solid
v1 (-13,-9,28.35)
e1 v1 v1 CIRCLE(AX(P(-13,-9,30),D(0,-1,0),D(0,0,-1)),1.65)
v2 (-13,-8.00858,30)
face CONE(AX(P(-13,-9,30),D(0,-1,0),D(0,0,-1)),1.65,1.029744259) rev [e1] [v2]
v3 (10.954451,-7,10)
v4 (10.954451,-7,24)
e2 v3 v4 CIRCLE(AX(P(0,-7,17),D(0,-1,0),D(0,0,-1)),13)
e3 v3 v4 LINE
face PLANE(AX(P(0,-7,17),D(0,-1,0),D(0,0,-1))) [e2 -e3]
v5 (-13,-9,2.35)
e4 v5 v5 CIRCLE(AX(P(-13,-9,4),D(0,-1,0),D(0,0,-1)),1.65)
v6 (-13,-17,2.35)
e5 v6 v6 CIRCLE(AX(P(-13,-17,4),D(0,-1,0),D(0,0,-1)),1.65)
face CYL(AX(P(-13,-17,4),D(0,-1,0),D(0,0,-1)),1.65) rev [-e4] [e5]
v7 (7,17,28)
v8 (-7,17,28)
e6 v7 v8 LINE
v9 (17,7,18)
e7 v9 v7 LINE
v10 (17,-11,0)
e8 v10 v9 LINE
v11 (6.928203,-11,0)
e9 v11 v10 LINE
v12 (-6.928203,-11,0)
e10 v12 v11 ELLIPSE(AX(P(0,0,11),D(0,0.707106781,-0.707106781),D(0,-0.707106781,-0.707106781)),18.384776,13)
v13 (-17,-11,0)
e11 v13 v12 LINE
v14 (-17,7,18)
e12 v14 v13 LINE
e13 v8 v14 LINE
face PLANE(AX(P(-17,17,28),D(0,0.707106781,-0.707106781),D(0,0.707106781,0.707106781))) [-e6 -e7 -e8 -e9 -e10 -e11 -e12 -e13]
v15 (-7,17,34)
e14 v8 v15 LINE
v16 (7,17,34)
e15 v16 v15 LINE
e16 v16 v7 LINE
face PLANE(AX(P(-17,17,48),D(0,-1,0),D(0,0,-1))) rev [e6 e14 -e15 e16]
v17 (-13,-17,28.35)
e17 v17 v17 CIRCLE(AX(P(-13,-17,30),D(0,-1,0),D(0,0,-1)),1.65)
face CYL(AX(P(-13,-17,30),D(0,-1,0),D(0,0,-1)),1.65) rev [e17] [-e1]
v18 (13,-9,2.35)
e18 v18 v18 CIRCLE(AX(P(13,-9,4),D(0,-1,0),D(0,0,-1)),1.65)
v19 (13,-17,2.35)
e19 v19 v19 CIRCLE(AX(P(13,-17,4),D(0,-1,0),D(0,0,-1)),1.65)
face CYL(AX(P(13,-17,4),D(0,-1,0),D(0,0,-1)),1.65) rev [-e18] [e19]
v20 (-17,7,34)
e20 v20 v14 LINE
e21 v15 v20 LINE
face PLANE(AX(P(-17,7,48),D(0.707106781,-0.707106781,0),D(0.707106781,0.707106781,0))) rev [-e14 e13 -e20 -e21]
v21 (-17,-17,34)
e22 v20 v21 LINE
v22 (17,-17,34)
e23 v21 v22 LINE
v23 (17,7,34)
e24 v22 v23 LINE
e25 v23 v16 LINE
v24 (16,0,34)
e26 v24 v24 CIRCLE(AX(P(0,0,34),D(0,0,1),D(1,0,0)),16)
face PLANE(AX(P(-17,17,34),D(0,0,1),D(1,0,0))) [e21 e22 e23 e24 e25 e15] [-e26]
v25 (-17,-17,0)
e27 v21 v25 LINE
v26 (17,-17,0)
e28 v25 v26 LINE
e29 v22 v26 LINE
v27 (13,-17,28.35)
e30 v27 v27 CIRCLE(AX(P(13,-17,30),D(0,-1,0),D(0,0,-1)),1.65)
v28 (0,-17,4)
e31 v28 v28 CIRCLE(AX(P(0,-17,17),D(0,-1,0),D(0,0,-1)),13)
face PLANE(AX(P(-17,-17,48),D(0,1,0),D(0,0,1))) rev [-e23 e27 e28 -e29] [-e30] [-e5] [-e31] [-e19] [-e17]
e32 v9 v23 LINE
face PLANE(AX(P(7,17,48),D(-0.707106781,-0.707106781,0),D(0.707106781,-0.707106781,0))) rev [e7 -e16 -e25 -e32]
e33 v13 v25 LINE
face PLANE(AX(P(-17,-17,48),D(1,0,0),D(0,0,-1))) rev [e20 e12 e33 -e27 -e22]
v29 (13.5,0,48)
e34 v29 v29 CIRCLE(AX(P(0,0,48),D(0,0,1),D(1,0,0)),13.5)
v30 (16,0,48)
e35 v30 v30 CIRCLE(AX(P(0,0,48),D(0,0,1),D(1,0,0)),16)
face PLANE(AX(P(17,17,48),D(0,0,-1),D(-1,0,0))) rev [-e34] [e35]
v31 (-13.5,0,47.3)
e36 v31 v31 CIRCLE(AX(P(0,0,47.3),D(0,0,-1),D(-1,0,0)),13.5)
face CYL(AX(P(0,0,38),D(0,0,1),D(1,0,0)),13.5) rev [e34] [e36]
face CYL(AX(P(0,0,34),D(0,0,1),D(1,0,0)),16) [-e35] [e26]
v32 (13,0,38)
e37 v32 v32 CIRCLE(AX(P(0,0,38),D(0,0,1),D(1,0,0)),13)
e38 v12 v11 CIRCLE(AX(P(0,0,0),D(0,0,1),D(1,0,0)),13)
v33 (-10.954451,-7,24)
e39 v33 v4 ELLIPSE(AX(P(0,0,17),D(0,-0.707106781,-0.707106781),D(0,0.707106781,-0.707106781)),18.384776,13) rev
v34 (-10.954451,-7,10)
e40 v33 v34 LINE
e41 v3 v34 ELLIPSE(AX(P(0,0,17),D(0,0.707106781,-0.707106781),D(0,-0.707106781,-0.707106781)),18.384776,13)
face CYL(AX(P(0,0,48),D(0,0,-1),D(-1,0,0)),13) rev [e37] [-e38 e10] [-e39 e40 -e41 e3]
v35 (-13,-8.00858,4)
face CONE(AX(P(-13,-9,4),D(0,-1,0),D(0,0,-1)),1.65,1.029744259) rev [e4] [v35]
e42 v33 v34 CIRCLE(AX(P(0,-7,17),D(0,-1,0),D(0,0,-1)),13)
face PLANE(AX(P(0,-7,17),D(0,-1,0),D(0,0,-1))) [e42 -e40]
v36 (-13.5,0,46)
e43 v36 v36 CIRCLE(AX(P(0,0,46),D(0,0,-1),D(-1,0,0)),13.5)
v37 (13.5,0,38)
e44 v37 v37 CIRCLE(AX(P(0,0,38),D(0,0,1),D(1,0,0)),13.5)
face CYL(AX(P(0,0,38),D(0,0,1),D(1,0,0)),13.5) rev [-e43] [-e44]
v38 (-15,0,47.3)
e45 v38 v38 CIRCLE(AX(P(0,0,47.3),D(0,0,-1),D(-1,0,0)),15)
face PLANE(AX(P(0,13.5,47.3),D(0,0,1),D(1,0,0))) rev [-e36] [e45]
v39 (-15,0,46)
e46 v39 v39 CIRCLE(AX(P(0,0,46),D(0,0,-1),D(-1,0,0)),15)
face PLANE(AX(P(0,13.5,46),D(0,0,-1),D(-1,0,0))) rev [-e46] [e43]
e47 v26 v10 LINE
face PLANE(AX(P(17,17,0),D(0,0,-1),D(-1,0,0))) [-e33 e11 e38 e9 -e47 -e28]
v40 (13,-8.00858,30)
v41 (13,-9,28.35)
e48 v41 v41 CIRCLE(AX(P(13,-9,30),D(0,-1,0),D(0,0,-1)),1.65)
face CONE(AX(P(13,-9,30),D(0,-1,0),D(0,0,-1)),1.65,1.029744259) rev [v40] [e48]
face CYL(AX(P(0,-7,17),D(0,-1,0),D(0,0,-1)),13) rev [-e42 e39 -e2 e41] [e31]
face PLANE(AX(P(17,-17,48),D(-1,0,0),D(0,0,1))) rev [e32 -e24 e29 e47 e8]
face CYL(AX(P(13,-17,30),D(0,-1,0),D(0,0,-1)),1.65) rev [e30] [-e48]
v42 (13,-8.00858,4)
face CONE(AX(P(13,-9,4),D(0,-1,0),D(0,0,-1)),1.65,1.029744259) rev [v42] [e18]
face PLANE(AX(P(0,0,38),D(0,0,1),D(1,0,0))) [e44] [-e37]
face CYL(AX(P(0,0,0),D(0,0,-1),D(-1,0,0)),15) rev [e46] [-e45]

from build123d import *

# Parameters (mm, degrees)
SKETCH_1_W             = 34
SKETCH_1_H             = 34
SKETCH_1_R             = 13
EXTRUDE_1_DEPTH        = 48
SKETCH_2_R             = 13.5
CUT_EXTRUDE_1_DEPTH    = 10
SKETCH_3_R             = 13
CUT_EXTRUDE_2_DEPTH    = 10
CHAMFER_1_SIZE         = 10
CHAMFER_2_SIZE         = 28
SKETCH_5_R             = 16
CUT_EXTRUDE_4_DEPTH    = 14
HOLE_WIZARD_M4_1_D     = 3.3
HOLE_WIZARD_M4_1_DEPTH = 8
HOLE_WIZARD_M4_1_TIP   = 0.991420021
SKETCH_8_W             = 1.3
SKETCH_8_H             = 1.5


with BuildPart() as part:
    # 草图1 → 凸台-拉伸1 (new body)
    with BuildSketch(Plane.XY):
        Rectangle(SKETCH_1_W, SKETCH_1_H)
        Circle(SKETCH_1_R, mode=Mode.SUBTRACT)
    extrude(amount=EXTRUDE_1_DEPTH)

    # 草图2 → 切除-拉伸1 (cut)
    with BuildSketch(Plane.XY.offset(48)):
        Circle(SKETCH_2_R)
    extrude(amount=-CUT_EXTRUDE_1_DEPTH, mode=Mode.SUBTRACT)

    # 草图3 → 切除-拉伸2 (cut)
    with BuildSketch(Plane.XZ.offset(17)):
        with Locations(Location((0, 17, 0), (0, 0, 270))):
            Circle(SKETCH_3_R)
    extrude(amount=-CUT_EXTRUDE_2_DEPTH, mode=Mode.SUBTRACT)

    # 倒角1
    chamfer_1_edges = [part.edges().sort_by_distance(p)[0] for p in [
        (-17, 17, 24),
        (17, 17, 24),
    ]]
    chamfer(chamfer_1_edges, length=CHAMFER_1_SIZE)

    # 倒角2
    # the kernel refuses this chamfer: 28 mm, written as the material it takes off along each edge
    with BuildSketch(Plane(origin=(79.007123663, 17, 0), x_dir=(0, -0.9996219169112968, -0.027495876610586376), z_dir=(-1, 0, 0))) as chamfer_2_piece_1:
        Polygon((CHAMFER_2_SIZE * 0.999621916911, CHAMFER_2_SIZE * 0.0274958766106), (-CHAMFER_2_SIZE * 0.0274958766106, CHAMFER_2_SIZE * 0.999621916911), (0, 0), align=None)
    extrude(amount=158.014247326, mode=Mode.SUBTRACT)

    # 草图5 → 切除-拉伸4 (cut)
    with BuildSketch(Plane.XY.offset(48)):
        Polygon((-7, 17), (-17, 7), (-17, -17), (17, -17), (17, 7), (7, 17), align=None)
        Circle(SKETCH_5_R, mode=Mode.SUBTRACT)
    extrude(amount=-CUT_EXTRUDE_4_DEPTH, mode=Mode.SUBTRACT)

    # M4 螺纹孔1
    with Locations(Plane.XZ.offset(17)):
        with Locations((13, 30), (13, 4), (-13, 4), (-13, 30)):
            Hole(HOLE_WIZARD_M4_1_D / 2, depth=HOLE_WIZARD_M4_1_DEPTH)
            with Locations((0, 0, -(HOLE_WIZARD_M4_1_DEPTH + HOLE_WIZARD_M4_1_TIP / 2))):  # 118° drill point
                Cone(0, HOLE_WIZARD_M4_1_D / 2, HOLE_WIZARD_M4_1_TIP, mode=Mode.SUBTRACT)

    # 草图8 → 切除-旋转1 (revolve, cut)
    with BuildSketch(Plane(origin=(0, 0, 0), x_dir=(0, 0, -1), z_dir=(1, 0, 0)), mode=Mode.PRIVATE) as cut_revolve_1_sk:
        with Locations((-46.65, 14.25)):
            Rectangle(SKETCH_8_W, SKETCH_8_H)
    revolve(cut_revolve_1_sk.sketch.rotate(Axis((0, 0, 0), (0, 0, 1)), 147.795772496), axis=Axis((0, 0, 0), (0, 0, 1)), mode=Mode.SUBTRACT)


solid = part.part
